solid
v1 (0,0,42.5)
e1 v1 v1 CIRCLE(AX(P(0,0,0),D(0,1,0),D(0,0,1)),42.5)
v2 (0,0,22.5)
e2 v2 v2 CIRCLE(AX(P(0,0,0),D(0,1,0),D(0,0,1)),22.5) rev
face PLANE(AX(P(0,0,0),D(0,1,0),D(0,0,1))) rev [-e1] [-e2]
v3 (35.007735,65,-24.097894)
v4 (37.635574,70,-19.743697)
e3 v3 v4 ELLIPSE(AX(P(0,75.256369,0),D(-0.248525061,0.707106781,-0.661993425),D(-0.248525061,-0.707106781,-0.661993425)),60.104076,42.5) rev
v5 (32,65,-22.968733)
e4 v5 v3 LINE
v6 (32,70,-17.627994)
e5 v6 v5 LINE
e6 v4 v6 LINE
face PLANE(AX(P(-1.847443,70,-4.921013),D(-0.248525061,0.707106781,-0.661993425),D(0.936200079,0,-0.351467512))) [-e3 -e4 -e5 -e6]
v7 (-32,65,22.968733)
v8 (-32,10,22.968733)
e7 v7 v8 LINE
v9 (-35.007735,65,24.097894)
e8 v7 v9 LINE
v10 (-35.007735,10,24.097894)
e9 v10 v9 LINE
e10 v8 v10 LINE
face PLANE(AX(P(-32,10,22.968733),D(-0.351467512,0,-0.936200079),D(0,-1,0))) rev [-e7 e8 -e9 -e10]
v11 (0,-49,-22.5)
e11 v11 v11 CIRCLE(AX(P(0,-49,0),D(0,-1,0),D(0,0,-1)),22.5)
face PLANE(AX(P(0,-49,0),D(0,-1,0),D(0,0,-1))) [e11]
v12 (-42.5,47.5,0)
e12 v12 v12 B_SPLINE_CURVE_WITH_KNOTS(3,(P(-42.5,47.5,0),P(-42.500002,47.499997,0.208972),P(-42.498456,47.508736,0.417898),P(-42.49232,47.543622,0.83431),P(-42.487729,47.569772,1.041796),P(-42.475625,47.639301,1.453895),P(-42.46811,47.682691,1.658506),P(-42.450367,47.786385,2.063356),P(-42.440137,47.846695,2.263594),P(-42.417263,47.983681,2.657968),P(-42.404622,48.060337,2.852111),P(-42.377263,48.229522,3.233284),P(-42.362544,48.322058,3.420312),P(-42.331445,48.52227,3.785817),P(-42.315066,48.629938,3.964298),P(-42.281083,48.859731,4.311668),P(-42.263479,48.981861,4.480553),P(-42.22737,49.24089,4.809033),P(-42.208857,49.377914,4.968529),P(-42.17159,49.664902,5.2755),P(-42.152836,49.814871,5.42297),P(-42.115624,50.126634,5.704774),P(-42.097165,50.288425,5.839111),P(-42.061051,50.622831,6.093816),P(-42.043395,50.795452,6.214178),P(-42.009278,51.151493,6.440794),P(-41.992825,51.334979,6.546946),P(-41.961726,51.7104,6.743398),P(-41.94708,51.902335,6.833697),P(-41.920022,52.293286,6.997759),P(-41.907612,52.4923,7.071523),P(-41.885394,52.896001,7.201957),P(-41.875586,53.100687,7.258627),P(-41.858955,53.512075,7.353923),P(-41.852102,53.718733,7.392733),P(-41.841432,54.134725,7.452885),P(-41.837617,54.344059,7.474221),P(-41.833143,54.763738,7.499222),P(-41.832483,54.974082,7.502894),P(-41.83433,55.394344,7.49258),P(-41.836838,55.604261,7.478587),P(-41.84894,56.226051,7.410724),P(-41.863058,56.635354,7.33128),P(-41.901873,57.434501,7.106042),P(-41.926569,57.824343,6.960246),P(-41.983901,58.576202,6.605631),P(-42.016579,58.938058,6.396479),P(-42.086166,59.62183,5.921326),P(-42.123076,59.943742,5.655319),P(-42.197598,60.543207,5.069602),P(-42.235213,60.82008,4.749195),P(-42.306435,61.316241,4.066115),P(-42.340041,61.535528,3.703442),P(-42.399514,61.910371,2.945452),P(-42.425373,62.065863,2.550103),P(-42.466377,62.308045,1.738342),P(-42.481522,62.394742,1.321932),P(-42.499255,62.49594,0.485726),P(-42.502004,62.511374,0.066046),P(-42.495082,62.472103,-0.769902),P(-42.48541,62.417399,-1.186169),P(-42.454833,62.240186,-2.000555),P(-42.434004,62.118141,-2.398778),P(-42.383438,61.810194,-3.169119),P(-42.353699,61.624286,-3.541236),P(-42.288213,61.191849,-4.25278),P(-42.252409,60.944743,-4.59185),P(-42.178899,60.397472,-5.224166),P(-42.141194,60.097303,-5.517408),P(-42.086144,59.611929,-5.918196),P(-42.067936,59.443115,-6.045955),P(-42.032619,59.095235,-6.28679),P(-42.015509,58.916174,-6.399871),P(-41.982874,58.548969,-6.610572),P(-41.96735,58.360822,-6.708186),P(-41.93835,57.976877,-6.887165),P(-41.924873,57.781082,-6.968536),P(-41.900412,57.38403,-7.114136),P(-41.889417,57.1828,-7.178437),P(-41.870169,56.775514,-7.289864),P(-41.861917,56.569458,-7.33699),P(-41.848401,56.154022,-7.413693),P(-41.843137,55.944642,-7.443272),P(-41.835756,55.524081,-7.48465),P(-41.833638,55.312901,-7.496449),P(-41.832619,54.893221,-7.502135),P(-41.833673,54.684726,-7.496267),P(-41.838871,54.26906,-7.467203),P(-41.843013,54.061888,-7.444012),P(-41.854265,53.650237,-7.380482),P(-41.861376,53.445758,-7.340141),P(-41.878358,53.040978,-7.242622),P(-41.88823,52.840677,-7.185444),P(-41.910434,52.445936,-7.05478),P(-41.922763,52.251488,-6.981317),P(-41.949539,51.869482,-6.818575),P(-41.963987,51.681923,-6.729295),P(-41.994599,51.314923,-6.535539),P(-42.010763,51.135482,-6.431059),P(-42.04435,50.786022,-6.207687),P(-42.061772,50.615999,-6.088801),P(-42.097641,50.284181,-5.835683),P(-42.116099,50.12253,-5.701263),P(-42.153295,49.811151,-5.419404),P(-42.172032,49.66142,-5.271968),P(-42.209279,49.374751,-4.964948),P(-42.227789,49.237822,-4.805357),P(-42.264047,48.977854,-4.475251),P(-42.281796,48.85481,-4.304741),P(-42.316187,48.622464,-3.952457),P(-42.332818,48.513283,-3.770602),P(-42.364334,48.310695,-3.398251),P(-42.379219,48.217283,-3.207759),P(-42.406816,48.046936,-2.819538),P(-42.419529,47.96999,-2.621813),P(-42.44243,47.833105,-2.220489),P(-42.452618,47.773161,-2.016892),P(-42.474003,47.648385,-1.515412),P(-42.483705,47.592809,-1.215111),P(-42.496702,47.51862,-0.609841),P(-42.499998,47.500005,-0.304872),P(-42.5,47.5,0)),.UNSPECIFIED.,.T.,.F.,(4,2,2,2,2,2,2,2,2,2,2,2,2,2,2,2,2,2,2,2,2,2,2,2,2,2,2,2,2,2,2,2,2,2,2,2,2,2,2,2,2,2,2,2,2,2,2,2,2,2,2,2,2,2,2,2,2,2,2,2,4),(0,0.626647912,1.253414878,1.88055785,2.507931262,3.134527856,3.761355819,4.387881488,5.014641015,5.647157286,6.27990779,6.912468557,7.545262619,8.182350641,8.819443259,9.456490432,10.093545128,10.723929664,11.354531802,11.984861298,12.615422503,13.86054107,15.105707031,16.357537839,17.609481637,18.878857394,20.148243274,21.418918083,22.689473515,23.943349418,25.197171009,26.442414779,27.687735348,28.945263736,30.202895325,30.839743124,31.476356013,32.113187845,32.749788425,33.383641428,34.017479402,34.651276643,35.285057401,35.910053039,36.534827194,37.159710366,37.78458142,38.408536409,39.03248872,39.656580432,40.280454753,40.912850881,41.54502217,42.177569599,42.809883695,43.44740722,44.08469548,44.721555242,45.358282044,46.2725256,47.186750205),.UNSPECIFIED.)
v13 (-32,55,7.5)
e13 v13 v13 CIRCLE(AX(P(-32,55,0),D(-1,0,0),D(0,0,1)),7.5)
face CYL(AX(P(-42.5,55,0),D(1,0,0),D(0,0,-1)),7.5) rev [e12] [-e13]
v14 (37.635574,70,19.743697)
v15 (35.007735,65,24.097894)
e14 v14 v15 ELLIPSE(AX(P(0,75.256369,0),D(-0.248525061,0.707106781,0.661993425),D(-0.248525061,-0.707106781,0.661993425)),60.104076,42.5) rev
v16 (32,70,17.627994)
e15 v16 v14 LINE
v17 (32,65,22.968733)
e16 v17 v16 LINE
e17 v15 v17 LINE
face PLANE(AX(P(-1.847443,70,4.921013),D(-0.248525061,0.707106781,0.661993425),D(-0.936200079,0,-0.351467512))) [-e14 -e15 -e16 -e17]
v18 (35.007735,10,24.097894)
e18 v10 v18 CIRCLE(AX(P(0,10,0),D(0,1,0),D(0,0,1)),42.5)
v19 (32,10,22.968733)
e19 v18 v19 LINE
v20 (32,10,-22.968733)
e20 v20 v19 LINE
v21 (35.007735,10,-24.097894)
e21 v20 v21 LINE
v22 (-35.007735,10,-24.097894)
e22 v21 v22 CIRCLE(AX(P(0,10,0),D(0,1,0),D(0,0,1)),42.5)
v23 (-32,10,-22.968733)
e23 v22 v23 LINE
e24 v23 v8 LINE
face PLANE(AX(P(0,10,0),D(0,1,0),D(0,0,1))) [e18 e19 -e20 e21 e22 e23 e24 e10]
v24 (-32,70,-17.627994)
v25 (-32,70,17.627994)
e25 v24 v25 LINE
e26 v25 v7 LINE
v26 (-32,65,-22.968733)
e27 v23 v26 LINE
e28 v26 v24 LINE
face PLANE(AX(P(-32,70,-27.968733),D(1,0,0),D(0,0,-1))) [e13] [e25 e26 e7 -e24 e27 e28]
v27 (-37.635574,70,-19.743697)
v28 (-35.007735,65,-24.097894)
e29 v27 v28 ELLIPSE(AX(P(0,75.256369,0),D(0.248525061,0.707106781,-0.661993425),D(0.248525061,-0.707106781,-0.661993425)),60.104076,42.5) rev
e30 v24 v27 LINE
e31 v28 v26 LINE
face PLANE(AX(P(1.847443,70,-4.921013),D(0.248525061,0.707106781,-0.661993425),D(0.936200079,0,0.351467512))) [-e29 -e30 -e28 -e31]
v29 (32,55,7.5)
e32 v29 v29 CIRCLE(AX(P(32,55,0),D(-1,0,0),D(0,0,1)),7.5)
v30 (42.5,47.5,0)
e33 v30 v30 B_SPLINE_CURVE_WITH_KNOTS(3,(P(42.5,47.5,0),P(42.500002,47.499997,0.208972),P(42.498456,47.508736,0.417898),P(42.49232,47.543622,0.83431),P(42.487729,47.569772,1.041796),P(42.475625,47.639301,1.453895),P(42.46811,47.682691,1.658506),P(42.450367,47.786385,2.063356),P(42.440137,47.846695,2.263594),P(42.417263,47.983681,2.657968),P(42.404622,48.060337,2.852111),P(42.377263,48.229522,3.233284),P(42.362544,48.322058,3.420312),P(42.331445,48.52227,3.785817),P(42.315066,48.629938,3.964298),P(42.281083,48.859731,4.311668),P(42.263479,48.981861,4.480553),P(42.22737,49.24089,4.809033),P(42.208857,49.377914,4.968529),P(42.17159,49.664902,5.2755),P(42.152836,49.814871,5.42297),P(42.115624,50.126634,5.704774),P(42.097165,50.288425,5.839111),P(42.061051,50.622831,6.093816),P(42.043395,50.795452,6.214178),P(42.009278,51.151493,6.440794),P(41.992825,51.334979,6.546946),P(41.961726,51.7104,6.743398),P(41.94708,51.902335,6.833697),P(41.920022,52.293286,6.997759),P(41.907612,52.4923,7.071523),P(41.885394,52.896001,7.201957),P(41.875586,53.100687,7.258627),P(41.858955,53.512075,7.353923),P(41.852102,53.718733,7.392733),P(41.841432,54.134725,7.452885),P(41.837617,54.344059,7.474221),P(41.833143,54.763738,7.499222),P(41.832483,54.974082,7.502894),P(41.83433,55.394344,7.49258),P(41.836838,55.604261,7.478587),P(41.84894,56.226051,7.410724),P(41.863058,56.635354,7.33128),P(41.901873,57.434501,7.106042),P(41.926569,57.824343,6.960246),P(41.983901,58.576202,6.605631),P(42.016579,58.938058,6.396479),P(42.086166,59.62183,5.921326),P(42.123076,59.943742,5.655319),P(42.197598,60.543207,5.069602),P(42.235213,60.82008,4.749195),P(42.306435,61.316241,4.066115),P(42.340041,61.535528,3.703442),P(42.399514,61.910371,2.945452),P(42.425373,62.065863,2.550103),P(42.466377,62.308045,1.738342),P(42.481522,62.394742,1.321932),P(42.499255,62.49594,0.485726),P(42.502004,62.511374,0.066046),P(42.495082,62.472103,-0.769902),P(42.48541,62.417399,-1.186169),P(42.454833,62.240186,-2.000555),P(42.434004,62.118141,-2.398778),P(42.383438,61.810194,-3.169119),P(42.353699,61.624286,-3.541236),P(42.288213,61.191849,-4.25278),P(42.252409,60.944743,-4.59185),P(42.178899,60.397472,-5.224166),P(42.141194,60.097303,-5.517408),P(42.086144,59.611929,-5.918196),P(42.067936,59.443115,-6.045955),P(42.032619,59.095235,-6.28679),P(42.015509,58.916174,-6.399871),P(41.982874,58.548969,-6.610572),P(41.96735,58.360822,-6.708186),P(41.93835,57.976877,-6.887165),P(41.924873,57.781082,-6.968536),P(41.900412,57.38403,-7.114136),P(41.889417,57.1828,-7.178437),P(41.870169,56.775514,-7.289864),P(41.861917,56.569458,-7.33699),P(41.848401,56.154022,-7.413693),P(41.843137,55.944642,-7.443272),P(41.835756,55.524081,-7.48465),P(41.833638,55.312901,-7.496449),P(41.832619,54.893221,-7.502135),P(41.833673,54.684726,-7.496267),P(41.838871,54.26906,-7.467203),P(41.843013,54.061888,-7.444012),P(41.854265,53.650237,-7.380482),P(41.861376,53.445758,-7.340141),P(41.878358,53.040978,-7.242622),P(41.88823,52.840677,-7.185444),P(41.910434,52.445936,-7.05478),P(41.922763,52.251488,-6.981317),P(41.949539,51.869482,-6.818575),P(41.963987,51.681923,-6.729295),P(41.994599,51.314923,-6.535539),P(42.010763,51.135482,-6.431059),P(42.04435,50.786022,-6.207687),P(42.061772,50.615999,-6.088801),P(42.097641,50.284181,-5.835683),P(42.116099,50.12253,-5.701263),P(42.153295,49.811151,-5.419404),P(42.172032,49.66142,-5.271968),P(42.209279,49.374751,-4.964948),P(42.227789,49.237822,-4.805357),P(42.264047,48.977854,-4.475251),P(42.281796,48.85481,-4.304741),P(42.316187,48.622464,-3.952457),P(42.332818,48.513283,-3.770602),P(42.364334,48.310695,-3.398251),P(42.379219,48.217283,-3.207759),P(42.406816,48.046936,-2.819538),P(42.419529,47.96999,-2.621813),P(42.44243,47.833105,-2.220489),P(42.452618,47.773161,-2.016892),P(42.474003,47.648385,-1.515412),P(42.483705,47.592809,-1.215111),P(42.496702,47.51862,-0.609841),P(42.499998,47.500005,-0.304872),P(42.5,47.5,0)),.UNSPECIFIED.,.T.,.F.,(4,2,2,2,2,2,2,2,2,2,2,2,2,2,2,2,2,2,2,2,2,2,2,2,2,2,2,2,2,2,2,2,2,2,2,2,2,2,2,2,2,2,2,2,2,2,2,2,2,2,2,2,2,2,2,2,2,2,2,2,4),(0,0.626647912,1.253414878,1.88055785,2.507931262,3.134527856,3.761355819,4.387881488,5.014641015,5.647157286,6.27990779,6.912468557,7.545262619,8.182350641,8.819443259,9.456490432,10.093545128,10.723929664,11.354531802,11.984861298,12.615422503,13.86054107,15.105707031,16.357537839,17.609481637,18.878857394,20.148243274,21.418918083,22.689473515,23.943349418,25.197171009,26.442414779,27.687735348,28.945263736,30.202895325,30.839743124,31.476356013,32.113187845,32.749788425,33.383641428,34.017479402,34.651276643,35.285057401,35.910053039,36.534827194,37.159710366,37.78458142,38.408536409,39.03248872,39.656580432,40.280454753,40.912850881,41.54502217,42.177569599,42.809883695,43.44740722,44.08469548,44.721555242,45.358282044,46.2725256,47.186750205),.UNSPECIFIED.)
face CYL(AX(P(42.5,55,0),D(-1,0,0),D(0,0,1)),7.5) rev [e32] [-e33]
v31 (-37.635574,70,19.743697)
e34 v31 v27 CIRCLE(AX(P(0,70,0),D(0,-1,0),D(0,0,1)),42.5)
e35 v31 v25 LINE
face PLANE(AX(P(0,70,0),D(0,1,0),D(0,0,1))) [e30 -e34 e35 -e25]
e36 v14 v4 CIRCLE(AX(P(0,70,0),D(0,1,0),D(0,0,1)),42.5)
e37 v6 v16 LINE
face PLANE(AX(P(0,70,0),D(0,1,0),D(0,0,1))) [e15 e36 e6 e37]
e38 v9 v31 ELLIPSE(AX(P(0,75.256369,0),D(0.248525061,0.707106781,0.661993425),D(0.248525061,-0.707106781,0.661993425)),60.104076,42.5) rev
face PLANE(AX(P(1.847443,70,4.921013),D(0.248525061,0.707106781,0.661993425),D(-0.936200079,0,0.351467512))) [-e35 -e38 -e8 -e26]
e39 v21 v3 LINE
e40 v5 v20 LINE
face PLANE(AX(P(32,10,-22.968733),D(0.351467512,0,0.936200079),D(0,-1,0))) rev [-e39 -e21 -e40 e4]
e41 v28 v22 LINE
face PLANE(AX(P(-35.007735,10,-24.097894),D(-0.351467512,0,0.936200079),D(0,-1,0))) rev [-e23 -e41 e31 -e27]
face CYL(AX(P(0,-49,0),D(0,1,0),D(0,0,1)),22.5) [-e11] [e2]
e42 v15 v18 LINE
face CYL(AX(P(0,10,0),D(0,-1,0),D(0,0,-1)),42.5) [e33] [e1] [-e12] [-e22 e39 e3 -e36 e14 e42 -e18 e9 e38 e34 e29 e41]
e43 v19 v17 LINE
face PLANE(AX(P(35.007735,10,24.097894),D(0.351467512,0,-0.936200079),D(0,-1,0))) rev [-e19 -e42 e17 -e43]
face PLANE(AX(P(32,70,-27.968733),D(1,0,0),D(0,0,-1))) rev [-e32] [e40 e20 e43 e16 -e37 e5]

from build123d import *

# Parameters (mm, degrees)
SKETCH1_R           = 42.5
BOSS_EXTRUDE1_DEPTH = 10
BOSS_EXTRUDE2_DEPTH = 60
SKETCH3_R           = 7.5
CUT_EXTRUDE1_DEPTH  = 111.709078219
SKETCH4_R           = 22.5
BOSS_EXTRUDE3_DEPTH = 49
CHAMFER1_SIZE       = 5
CHAMFER2_SIZE       = 5


with BuildPart() as part:
    # Sketch1 → Boss-Extrude1 (new body)
    with BuildSketch(Plane(origin=(0, 0, 0), x_dir=(1, 0, 0), z_dir=(0, 1, 0))):
        with Locations(Location((0, 0, 0), (0, 0, 270))):
            Circle(SKETCH1_R)
    extrude(amount=BOSS_EXTRUDE1_DEPTH)

    # Sketch2 → Boss-Extrude2 (add)
    with BuildSketch(Plane(origin=(0, 10, 0), x_dir=(1, 0, 0), z_dir=(0, 1, 0))):
        with BuildLine():
            Line((32, 27.968732542), (32, -27.968732542))
            ThreePointArc((32, -27.968732542), (42.5, 0), (32, 27.968732542))
        make_face()
    boss_extrude2 = extrude(amount=BOSS_EXTRUDE2_DEPTH)

    # Sketch3 → Cut-Extrude1 (cut, through all)
    with BuildSketch(Plane.ZY.offset(-32)):
        with Locations((0, 55)):
            Circle(SKETCH3_R)
    cut_extrude1 = extrude(amount=-CUT_EXTRUDE1_DEPTH, mode=Mode.SUBTRACT)

    # Mirror1: Boss-Extrude2, Cut-Extrude1 across plane
    add(boss_extrude2.mirror(Plane(origin=(0, 0, 0), x_dir=(0, 0, 1), z_dir=(1, 0, 0))))
    add(cut_extrude1.mirror(Plane(origin=(0, 0, 0), x_dir=(0, 0, 1), z_dir=(1, 0, 0))), mode=Mode.SUBTRACT)

    # Sketch4 → Boss-Extrude3 (add)
    with BuildSketch(Plane.XZ):
        with Locations(Location((0, 0, 0), (0, 0, 90))):
            Circle(SKETCH4_R)
    extrude(amount=BOSS_EXTRUDE3_DEPTH)

    # Chamfer1
    # the kernel refuses this chamfer: 5 mm, written as the material it takes off along each edge
    with BuildSketch(Plane(origin=(32, 10, -27.968732542), x_dir=(0.613569743675552, 0, 0.7896405319168447), z_dir=(0, 1, 0)), Plane(origin=(-32, 10, 27.968732542), x_dir=(-0.613569743675558, 0, -0.78964053191684), z_dir=(0, 1, 0))) as chamfer1_piece_1:
        with BuildLine():
            Line((4.902026088, 0), (CHAMFER1_SIZE * 0.789640531917, -CHAMFER1_SIZE * 0.613569743676))
            Line((CHAMFER1_SIZE * 0.789640531917, -CHAMFER1_SIZE * 0.613569743676), (0, 0))
            ThreePointArc((0, 0), (2.480684858, 0.070724564), (4.902026088, 0))
        make_face()
    extrude(amount=72.684374005, mode=Mode.SUBTRACT)
    with BuildSketch(Plane(origin=(32, 10, 27.968732542), x_dir=(0.6135697436755528, 0, -0.7896405319168441), z_dir=(0, 1, 0)), Plane(origin=(-32, 10, -27.968732542), x_dir=(-0.6135697436755566, 0, 0.7896405319168412), z_dir=(0, 1, 0))) as chamfer1_piece_2:
        with BuildLine():
            Line((4.902026088, 0), (CHAMFER1_SIZE * 0.789640531917, CHAMFER1_SIZE * 0.613569743676))
            Line((CHAMFER1_SIZE * 0.789640531917, CHAMFER1_SIZE * 0.613569743676), (0, 0))
            ThreePointArc((0, 0), (2.480684858, -0.070724564), (4.902026088, 0))
        make_face()
    extrude(amount=72.684374005, mode=Mode.SUBTRACT)

    # Chamfer2
    chamfer2_edges = [part.edges().sort_by_distance(p)[0] for p in [
        (33.503867445, 70, -23.533313298),
        (33.503867445, 70, 23.533313298),
        (-33.503867445, 70, 23.533313298),
        (-33.503867445, 70, -23.533313298),
    ]]
    chamfer(chamfer2_edges, length=CHAMFER2_SIZE)


solid = part.part
